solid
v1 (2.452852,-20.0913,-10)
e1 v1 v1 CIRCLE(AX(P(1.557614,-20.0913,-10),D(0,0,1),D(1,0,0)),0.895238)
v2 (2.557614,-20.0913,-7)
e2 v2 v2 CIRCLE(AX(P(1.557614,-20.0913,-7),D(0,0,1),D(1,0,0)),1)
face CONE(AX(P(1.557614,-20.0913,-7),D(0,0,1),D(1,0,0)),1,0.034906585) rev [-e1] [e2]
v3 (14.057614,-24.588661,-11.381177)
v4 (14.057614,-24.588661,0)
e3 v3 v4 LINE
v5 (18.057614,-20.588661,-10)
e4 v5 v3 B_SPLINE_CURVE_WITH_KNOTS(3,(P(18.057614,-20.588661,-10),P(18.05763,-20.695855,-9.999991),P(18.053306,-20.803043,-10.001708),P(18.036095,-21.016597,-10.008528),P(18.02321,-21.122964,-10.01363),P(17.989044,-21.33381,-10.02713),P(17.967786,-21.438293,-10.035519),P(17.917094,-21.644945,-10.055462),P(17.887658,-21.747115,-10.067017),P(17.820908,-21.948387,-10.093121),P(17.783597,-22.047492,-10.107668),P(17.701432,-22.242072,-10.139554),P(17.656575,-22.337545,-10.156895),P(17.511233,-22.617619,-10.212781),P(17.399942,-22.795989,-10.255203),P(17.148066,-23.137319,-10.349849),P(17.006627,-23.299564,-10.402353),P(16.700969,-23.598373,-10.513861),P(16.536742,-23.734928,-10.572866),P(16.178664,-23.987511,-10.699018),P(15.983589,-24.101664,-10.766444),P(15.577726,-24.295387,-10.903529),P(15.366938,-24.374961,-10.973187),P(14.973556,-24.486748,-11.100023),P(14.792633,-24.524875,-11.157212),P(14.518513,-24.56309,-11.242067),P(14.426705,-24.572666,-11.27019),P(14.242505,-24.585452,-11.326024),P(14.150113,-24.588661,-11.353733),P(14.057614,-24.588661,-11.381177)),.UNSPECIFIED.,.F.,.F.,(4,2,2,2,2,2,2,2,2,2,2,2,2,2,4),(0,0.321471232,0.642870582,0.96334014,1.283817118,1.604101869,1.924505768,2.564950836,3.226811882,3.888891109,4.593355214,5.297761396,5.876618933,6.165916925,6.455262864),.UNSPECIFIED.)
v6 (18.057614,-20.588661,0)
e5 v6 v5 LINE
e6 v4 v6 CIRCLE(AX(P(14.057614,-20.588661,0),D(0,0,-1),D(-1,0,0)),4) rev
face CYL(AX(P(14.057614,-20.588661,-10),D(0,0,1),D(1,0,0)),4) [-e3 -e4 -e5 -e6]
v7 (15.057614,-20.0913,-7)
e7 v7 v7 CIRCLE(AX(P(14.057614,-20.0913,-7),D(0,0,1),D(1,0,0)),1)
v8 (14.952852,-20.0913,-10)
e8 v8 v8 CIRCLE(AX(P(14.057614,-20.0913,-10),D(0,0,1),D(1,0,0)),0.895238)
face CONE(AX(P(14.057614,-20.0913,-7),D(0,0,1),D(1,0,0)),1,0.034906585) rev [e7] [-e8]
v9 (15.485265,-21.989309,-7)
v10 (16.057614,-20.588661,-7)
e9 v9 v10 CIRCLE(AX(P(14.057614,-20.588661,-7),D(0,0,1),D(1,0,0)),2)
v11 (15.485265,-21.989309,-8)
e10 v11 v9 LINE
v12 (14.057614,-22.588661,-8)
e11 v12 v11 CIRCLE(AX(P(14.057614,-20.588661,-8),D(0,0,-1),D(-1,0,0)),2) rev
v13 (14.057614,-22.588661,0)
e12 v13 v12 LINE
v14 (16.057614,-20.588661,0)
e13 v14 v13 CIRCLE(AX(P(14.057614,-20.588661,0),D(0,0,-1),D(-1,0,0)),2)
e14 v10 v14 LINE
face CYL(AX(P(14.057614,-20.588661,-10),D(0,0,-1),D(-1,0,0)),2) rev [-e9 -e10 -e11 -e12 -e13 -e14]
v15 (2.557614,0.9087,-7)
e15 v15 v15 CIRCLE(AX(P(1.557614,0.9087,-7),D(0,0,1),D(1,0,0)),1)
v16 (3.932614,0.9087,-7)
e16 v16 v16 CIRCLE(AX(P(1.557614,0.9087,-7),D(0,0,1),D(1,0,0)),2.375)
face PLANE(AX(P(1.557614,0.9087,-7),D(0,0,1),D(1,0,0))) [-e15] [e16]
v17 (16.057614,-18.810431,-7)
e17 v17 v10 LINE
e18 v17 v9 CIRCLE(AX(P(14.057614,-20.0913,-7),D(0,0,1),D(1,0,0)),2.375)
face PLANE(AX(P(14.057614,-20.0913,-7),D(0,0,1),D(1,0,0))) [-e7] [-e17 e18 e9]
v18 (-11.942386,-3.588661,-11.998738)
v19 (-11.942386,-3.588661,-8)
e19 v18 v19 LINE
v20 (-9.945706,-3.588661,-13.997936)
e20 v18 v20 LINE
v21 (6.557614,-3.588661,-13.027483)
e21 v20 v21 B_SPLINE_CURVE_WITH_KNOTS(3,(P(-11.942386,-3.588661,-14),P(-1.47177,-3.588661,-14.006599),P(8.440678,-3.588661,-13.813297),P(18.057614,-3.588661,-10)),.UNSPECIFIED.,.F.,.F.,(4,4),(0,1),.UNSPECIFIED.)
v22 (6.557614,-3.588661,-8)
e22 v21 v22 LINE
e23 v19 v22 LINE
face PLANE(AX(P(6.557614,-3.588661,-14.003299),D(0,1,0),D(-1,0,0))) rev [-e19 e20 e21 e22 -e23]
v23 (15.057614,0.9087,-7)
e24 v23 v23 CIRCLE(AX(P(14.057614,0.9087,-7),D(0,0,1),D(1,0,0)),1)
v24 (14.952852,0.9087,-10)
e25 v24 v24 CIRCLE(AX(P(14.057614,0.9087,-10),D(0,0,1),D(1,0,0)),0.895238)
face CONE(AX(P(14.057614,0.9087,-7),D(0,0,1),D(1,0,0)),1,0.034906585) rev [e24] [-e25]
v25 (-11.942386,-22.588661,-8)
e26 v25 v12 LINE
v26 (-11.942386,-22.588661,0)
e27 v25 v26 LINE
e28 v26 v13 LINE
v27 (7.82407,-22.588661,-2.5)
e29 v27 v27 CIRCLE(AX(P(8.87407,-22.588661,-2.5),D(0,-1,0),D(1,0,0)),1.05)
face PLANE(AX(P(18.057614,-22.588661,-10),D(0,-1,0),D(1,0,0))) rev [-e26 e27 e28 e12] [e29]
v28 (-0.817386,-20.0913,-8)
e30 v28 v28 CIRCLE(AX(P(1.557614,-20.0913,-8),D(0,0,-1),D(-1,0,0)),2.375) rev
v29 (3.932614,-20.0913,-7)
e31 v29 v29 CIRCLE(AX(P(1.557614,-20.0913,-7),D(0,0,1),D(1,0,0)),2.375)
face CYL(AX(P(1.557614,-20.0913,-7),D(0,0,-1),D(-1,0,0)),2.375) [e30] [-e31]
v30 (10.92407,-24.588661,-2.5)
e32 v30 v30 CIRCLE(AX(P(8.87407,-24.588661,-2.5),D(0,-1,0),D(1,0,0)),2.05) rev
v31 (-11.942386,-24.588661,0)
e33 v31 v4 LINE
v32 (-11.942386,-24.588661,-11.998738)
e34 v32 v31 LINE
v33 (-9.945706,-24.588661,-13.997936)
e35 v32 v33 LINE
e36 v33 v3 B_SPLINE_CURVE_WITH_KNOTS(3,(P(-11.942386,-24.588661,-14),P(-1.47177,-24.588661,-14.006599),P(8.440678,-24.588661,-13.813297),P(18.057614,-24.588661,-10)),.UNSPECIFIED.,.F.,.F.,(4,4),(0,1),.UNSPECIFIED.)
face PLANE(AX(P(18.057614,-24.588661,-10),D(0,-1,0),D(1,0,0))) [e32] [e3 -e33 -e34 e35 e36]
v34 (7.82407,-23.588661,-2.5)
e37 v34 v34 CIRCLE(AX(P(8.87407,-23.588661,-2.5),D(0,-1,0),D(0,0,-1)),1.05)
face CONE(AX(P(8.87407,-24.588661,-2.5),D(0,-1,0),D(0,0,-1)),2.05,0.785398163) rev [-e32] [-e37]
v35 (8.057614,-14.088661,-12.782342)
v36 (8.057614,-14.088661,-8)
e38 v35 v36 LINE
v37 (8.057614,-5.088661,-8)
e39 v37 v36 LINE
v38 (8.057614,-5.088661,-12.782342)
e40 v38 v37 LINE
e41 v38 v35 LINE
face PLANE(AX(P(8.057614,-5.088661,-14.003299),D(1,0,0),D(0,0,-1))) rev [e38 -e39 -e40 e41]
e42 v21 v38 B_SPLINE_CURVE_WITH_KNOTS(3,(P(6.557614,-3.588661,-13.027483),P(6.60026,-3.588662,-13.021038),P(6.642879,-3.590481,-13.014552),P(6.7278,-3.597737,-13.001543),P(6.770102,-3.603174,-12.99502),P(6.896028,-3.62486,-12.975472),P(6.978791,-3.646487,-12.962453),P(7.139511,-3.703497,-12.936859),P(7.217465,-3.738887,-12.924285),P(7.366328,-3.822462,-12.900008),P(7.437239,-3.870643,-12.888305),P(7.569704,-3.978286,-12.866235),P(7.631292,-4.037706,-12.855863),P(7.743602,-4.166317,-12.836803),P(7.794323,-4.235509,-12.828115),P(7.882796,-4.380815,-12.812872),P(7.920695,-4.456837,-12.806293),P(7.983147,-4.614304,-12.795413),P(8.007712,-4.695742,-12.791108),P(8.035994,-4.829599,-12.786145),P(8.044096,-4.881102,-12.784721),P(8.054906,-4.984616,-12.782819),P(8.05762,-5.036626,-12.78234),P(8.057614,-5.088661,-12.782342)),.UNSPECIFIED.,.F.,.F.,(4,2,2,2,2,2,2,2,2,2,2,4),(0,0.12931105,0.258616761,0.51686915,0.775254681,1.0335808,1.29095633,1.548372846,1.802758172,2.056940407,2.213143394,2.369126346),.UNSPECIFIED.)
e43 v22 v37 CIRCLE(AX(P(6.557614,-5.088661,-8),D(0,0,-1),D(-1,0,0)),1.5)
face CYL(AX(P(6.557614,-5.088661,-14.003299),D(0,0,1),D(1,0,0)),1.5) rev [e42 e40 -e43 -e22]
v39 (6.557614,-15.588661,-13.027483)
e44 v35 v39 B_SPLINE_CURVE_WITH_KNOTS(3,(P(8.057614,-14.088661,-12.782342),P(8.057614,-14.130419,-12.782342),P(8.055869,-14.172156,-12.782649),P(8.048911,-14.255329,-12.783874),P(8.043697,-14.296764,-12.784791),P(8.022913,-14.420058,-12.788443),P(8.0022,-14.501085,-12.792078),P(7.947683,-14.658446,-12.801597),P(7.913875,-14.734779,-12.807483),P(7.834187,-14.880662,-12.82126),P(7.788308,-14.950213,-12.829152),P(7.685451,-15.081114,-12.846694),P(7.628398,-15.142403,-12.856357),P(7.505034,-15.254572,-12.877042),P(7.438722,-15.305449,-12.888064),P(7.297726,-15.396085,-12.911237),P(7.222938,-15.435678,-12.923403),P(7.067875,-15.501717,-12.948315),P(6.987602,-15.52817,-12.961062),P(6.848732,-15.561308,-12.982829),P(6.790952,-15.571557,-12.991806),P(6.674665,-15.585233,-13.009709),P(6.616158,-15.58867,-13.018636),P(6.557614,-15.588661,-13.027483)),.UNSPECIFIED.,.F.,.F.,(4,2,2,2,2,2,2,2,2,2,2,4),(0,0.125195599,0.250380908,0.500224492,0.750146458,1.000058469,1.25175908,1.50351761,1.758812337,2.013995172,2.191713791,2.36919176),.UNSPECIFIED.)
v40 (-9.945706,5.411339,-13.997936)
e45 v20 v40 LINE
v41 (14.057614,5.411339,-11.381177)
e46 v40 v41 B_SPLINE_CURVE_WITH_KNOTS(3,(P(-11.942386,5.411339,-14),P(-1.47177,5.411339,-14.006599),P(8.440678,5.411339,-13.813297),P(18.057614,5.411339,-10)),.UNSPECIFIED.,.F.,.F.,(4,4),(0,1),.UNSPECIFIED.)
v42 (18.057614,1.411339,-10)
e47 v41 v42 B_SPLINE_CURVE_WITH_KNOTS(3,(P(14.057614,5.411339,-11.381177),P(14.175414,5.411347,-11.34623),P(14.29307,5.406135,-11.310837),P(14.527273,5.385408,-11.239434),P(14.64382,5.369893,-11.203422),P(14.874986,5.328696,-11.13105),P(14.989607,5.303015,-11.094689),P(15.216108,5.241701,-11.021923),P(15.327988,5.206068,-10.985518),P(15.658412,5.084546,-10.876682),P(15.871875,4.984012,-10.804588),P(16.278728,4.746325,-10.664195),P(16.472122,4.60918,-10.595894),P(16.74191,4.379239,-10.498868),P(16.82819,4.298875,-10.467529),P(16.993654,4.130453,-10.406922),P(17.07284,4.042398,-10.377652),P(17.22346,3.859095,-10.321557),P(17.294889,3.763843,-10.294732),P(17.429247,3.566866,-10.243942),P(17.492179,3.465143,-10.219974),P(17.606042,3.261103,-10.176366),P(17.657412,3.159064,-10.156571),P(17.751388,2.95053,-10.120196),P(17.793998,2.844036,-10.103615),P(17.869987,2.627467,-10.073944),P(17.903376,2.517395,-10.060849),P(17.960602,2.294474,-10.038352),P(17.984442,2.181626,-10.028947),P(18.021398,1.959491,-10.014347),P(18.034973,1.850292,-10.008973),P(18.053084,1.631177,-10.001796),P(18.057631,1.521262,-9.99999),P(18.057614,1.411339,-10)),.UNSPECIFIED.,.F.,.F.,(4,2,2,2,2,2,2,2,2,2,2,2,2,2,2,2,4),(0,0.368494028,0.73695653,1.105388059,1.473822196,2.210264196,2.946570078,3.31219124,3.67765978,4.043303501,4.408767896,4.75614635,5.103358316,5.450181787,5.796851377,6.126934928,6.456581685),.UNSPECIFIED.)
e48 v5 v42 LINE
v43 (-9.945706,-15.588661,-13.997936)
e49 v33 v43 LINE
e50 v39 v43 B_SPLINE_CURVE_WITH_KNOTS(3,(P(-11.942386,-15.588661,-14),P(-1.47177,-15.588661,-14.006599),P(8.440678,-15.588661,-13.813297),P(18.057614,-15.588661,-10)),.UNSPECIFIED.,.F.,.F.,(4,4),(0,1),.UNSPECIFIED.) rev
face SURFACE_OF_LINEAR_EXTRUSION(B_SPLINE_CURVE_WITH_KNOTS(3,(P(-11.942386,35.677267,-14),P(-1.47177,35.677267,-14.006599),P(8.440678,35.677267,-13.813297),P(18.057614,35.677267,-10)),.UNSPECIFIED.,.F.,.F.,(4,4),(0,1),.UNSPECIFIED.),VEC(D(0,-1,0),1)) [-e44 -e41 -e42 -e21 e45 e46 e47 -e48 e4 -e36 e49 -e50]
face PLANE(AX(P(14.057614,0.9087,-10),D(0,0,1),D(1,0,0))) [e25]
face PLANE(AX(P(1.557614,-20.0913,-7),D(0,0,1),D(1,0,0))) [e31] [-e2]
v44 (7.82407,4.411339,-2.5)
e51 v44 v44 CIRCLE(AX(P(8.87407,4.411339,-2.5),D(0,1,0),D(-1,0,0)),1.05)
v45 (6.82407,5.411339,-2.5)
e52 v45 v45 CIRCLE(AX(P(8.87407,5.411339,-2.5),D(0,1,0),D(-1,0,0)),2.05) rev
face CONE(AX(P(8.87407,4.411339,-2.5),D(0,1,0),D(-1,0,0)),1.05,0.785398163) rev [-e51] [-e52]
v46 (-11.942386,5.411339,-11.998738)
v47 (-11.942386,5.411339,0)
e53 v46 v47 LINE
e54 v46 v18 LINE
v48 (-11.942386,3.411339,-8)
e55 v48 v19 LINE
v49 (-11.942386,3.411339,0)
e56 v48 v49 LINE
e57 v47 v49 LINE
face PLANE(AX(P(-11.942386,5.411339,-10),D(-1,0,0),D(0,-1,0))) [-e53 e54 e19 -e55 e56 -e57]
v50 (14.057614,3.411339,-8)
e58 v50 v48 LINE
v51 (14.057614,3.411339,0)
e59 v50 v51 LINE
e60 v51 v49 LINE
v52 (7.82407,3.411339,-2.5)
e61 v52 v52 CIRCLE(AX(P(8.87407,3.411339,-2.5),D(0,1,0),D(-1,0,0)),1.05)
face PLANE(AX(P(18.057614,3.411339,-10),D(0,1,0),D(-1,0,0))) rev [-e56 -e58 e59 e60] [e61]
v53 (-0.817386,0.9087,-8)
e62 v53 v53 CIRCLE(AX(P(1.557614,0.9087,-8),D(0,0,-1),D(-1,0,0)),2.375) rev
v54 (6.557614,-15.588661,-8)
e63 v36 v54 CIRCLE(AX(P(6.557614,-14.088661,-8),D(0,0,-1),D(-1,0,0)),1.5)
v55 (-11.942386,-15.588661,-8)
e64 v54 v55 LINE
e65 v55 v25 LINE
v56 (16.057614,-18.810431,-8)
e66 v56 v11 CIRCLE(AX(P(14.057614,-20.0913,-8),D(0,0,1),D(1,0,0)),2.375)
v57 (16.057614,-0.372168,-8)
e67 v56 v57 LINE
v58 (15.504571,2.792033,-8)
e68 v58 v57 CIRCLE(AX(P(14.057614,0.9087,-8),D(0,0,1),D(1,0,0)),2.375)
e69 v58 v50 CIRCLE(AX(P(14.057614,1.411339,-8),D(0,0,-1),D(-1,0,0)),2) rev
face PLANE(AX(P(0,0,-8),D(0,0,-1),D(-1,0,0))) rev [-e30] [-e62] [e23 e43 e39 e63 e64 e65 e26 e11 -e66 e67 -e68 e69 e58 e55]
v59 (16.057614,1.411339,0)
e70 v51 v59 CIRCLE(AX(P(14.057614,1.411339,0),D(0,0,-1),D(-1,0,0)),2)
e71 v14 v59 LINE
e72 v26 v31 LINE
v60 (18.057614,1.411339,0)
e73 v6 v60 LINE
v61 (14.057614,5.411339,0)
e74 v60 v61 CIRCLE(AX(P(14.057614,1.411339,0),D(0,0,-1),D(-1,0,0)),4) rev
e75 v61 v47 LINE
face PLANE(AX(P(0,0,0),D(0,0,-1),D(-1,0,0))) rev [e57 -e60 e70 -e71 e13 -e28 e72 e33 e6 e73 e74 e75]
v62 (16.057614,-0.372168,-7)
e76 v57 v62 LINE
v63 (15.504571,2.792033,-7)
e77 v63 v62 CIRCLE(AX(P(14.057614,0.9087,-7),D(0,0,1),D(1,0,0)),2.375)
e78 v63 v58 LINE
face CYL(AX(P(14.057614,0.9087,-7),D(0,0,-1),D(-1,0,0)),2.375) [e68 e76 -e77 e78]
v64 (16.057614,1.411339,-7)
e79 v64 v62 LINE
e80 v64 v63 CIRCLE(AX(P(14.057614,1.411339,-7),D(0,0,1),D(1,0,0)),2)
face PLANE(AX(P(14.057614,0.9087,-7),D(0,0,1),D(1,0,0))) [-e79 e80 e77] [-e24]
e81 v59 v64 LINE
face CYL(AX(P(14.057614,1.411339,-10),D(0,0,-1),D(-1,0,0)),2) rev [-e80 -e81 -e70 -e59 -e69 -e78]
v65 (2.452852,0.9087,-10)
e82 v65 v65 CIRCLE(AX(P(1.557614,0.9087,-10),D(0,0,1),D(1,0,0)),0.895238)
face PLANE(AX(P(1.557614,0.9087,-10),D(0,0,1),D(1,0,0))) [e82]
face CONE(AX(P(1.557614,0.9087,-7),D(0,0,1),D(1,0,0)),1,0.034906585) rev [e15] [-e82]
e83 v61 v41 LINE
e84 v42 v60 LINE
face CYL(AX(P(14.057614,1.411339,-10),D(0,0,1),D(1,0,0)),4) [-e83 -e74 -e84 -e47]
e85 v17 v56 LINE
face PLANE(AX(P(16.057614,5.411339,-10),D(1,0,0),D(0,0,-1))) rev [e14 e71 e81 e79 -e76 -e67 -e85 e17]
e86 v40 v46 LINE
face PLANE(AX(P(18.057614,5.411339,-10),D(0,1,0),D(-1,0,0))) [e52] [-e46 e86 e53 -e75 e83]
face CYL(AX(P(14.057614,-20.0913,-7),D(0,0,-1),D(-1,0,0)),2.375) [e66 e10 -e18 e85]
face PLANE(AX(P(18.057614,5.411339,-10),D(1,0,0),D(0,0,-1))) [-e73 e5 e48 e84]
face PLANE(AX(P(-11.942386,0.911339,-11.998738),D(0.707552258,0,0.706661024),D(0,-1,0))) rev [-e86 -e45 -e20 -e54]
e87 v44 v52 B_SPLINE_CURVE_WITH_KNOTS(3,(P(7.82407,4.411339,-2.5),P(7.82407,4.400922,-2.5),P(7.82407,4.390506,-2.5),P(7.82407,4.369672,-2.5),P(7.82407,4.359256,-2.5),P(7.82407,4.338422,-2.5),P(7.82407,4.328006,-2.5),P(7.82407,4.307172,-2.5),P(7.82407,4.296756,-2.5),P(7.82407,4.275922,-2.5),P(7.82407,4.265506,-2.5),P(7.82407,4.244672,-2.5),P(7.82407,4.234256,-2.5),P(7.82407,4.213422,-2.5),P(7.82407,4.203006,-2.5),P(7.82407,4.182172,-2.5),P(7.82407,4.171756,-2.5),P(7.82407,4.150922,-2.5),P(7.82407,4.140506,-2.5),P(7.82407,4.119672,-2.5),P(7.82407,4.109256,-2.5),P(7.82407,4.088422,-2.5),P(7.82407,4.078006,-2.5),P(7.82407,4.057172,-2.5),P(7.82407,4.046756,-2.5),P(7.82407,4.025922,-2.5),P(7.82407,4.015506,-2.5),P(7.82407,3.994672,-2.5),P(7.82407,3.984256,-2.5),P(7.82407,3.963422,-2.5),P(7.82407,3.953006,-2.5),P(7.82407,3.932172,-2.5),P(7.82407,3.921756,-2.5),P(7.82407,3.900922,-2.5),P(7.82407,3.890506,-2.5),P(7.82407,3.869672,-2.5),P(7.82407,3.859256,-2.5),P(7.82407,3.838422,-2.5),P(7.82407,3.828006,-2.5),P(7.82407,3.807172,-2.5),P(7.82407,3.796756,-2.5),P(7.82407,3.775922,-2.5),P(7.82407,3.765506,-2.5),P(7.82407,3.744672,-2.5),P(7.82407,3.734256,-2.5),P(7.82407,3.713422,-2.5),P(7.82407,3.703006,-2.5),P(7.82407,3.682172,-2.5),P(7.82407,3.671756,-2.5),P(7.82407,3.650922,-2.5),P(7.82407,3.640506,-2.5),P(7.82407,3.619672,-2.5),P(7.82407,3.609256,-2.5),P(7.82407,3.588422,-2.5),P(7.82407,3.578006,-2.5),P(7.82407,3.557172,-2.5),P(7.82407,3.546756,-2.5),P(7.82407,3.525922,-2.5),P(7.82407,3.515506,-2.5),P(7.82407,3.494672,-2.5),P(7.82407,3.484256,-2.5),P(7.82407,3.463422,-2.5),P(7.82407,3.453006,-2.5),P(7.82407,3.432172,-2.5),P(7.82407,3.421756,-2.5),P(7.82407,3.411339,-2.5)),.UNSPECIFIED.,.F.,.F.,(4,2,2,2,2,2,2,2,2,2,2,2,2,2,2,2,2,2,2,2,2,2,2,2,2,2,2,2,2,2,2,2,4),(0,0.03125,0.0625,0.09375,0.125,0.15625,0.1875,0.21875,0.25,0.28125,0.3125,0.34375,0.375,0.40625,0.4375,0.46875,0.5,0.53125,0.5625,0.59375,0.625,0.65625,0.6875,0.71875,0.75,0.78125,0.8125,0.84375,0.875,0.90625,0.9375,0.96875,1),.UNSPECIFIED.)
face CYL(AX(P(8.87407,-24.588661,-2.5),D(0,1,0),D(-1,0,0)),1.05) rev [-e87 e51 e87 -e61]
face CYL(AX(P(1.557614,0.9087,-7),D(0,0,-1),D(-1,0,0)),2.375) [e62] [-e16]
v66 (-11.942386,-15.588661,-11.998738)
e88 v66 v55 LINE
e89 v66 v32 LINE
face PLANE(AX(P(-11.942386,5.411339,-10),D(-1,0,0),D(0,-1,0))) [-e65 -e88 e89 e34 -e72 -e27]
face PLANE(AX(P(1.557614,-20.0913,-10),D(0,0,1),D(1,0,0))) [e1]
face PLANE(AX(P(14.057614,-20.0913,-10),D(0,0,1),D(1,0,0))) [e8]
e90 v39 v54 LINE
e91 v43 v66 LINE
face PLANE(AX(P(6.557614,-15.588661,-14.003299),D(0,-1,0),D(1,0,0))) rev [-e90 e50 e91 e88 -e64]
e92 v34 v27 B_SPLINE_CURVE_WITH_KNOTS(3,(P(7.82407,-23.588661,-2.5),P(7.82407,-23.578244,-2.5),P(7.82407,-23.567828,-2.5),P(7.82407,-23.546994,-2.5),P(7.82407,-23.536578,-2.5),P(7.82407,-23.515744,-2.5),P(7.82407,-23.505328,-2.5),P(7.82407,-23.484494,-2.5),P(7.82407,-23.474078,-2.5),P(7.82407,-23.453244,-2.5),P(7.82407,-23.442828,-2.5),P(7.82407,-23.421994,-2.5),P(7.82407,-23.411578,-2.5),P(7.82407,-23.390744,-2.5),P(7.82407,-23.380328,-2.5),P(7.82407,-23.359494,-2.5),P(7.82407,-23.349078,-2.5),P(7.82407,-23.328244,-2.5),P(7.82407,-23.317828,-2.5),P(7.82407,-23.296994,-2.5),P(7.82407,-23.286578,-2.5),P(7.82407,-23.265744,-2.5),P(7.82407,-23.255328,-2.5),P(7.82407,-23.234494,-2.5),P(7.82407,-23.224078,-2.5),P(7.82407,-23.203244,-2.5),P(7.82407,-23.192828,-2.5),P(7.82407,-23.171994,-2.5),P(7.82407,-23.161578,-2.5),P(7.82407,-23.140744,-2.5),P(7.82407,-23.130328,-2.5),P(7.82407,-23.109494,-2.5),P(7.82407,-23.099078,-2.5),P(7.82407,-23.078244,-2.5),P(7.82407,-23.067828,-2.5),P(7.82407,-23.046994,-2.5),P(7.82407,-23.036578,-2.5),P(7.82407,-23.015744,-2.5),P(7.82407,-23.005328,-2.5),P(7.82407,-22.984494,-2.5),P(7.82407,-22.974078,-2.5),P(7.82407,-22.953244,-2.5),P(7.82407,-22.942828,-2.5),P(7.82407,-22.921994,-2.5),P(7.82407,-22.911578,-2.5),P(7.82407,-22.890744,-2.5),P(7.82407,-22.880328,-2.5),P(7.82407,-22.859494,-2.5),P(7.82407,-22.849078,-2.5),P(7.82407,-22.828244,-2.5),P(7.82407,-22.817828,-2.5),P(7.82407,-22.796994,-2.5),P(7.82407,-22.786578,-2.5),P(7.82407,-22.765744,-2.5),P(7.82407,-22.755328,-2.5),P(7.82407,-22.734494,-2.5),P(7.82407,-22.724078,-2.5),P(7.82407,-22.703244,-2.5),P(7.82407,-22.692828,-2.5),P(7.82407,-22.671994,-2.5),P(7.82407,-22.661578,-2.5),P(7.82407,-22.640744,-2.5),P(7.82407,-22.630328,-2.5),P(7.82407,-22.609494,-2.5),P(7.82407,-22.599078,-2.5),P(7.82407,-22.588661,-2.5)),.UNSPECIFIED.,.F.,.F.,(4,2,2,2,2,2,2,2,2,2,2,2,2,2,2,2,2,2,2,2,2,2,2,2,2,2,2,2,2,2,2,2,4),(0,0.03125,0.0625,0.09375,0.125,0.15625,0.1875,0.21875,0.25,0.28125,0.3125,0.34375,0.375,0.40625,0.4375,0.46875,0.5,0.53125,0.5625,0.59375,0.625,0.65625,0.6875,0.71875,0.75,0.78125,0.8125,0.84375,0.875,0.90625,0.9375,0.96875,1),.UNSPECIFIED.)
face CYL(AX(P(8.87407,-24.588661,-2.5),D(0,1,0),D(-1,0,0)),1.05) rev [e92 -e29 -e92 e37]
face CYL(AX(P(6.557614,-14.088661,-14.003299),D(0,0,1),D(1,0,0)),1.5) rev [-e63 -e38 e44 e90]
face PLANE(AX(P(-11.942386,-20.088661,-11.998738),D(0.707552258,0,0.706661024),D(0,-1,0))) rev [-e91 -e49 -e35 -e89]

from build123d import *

# Parameters (mm, degrees)
SKETCH_2_W                    = 30
SKETCH_2_H                    = 30
EXTRUDE_1_DEPTH               = 10
SHELL_1_T                     = -2
CUT_EXTRUDE_1_REACH           = 34.104
SKETCH_3_W                    = 28
SKETCH_3_H                    = 26
EXTRUDE_2_DEPTH               = 30
CUT_EXTRUDE_2_DEPTH           = 34.566112599
SKETCH_6_R                    = 2.375
EXTRUDE_3_DEPTH               = 1
SKETCH_7_R                    = 1
CUT_EXTRUDE_3_DEPTH           = 3
CUT_EXTRUDE_3_DRAFT           = -2
CUT_EXTRUDE_3_PROFILE_2_DEPTH = 3
CUT_EXTRUDE_3_PROFILE_2_DRAFT = -2
CUT_EXTRUDE_3_PROFILE_3_DEPTH = 3
CUT_EXTRUDE_3_PROFILE_3_DRAFT = -2
CUT_EXTRUDE_3_PROFILE_4_DEPTH = 3
CUT_EXTRUDE_3_PROFILE_4_DRAFT = -2
FILLET_2_R                    = 2
FILLET_3_R                    = 4
SKETCH_8_R                    = 1.05
CUT_EXTRUDE_4_DEPTH           = 38.710498044
CHAMFER_1_SIZE                = 1
CHAMFER_2_SIZE                = 2.001261587
CHAMFER_2_SIZE_2              = 2


with BuildPart() as part:
    # 草图2 → 凸台-拉伸1 (new body)
    with BuildSketch(Plane.XY):
        with Locations((3.057614324, -9.588661073)):
            Rectangle(SKETCH_2_W, SKETCH_2_H)
    extrude(amount=-EXTRUDE_1_DEPTH)

    # 抽壳1
    shell_1_openings = [part.faces().sort_by_distance(p)[0] for p in [
        (-11.942385676, -9.588661073, -5),
    ]]
    offset(amount=SHELL_1_T, openings=shell_1_openings, kind=Kind.INTERSECTION)

    # 草图3 → 切除-拉伸1 (cut, up to next)
    with BuildSketch(Plane.XY, mode=Mode.PRIVATE) as cut_extrude_1_sk1:
        with Locations((2.057614324, -9.588661073)):
            Rectangle(SKETCH_3_W, SKETCH_3_H)
    cut_extrude_1_tool1 = extrude(cut_extrude_1_sk1.sketch, amount=-CUT_EXTRUDE_1_REACH, mode=Mode.PRIVATE) & part.part
    add(cut_extrude_1_tool1.solids().sort_by_distance((2.057614, -9.588661, 0))[0], mode=Mode.SUBTRACT)

    # 草图4 → 凸台-拉伸2 (add)
    with BuildSketch(Plane.XZ.offset(24.588661073)):
        with BuildLine():
            Line((-11.942385676, -10), (-11.942385676, -14))
            add(Edge.make_bspline(
                [(-11.942385676, -14), (-1.471769767, -14.006598556), (8.440678476, -13.813297469), (18.057614324, -10)],
                knots=[0, 0, 0, 0, 1, 1, 1, 1], degree=3))
            Line((18.057614324, -10), (-11.942385676, -10))
        make_face()
    extrude(amount=-EXTRUDE_2_DEPTH)

    # 草图5 → 切除-拉伸2 (cut, through all)
    with BuildSketch(Plane.XY):
        with BuildLine():
            Line((6.557614324, -3.588661073), (-11.942385676, -3.588661073))
            Line((-11.942385676, -3.588661073), (-11.942385676, -15.588661073))
            Line((-11.942385676, -15.588661073), (6.557614324, -15.588661073))
            ThreePointArc((6.557614324, -15.588661073), (7.618274496, -15.149321245), (8.057614324, -14.088661073))
            Line((8.057614324, -14.088661073), (8.057614324, -5.088661073))
            ThreePointArc((8.057614324, -5.088661073), (7.618274496, -4.028000901), (6.557614324, -3.588661073))
        make_face()
    extrude(amount=-CUT_EXTRUDE_2_DEPTH, mode=Mode.SUBTRACT)

    # 草图6 → 凸台-拉伸3 (add)
    with BuildSketch(Plane.XY.offset(-8)):
        with Locations(Location((1.557614324, 0.908700453, 0), (0, 0, 180))):
            Circle(SKETCH_6_R)
        with Locations((14.057614324, 0.908700453)):
            Circle(SKETCH_6_R)
        with Locations(Location((1.557614324, -20.091299547, 0), (0, 0, 180))):
            Circle(SKETCH_6_R)
        with Locations((14.057614324, -20.091299547)):
            Circle(SKETCH_6_R)
    extrude(amount=EXTRUDE_3_DEPTH)


with BuildPart() as cut_extrude_3_tool:
    # 草图7 → 切除-拉伸3 (with draft: the straight prism first)
    with BuildSketch(Plane.XY.offset(-7)):
        with Locations((1.557614324, -20.091299547)):
            Circle(SKETCH_7_R)
    extrude(amount=-CUT_EXTRUDE_3_DEPTH)
    # 切除-拉伸3: the draft: its side faces are tilted about the plane it starts from
    cut_extrude_3_sides = [cut_extrude_3_tool.faces().sort_by_distance(p)[0] for p in [
        (0.557614324, -20.091299547, -8.5),
    ]]
    draft(cut_extrude_3_sides, Plane.XY.offset(-7), CUT_EXTRUDE_3_DRAFT)


with BuildPart() as part_1:
    add(part.part)

    # 切除-拉伸3: cut by cut_extrude_3_tool
    add(cut_extrude_3_tool.part, mode=Mode.SUBTRACT)


with BuildPart() as cut_extrude_3_profile_2_tool:
    # 草图7 → 切除-拉伸3 profile 2 (with draft: the straight prism first)
    with BuildSketch(Plane.XY.offset(-7)):
        with Locations((14.057614324, -20.091299547)):
            Circle(SKETCH_7_R)
    extrude(amount=-CUT_EXTRUDE_3_PROFILE_2_DEPTH)
    # 切除-拉伸3 profile 2: the draft: its side faces are tilted about the plane it starts from
    cut_extrude_3_profile_2_sides = [cut_extrude_3_profile_2_tool.faces().sort_by_distance(p)[0] for p in [
        (13.057614324, -20.091299547, -8.5),
    ]]
    draft(cut_extrude_3_profile_2_sides, Plane.XY.offset(-7), CUT_EXTRUDE_3_PROFILE_2_DRAFT)


with BuildPart() as part_2:
    add(part_1.part)

    # 切除-拉伸3 profile 2: cut by cut_extrude_3_profile_2_tool
    add(cut_extrude_3_profile_2_tool.part, mode=Mode.SUBTRACT)


with BuildPart() as cut_extrude_3_profile_3_tool:
    # 草图7 → 切除-拉伸3 profile 3 (with draft: the straight prism first)
    with BuildSketch(Plane.XY.offset(-7)):
        with Locations((1.557614324, 0.908700453)):
            Circle(SKETCH_7_R)
    extrude(amount=-CUT_EXTRUDE_3_PROFILE_3_DEPTH)
    # 切除-拉伸3 profile 3: the draft: its side faces are tilted about the plane it starts from
    cut_extrude_3_profile_3_sides = [cut_extrude_3_profile_3_tool.faces().sort_by_distance(p)[0] for p in [
        (0.557614324, 0.908700453, -8.5),
    ]]
    draft(cut_extrude_3_profile_3_sides, Plane.XY.offset(-7), CUT_EXTRUDE_3_PROFILE_3_DRAFT)


with BuildPart() as part_3:
    add(part_2.part)

    # 切除-拉伸3 profile 3: cut by cut_extrude_3_profile_3_tool
    add(cut_extrude_3_profile_3_tool.part, mode=Mode.SUBTRACT)


with BuildPart() as cut_extrude_3_profile_4_tool:
    # 草图7 → 切除-拉伸3 profile 4 (with draft: the straight prism first)
    with BuildSketch(Plane.XY.offset(-7)):
        with Locations((14.057614324, 0.908700453)):
            Circle(SKETCH_7_R)
    extrude(amount=-CUT_EXTRUDE_3_PROFILE_4_DEPTH)
    # 切除-拉伸3 profile 4: the draft: its side faces are tilted about the plane it starts from
    cut_extrude_3_profile_4_sides = [cut_extrude_3_profile_4_tool.faces().sort_by_distance(p)[0] for p in [
        (13.057614324, 0.908700453, -8.5),
    ]]
    draft(cut_extrude_3_profile_4_sides, Plane.XY.offset(-7), CUT_EXTRUDE_3_PROFILE_4_DRAFT)


with BuildPart() as part_4:
    add(part_3.part)

    # 切除-拉伸3 profile 4: cut by cut_extrude_3_profile_4_tool
    add(cut_extrude_3_profile_4_tool.part, mode=Mode.SUBTRACT)

    # 圆角2
    fillet_2_edges = [part_4.edges().sort_by_distance(p)[0] for p in [
        (16.057614324, 3.411338927, -4),
        (16.057614324, -22.588661073, -4),
    ]]
    fillet(fillet_2_edges, radius=FILLET_2_R)

    # 圆角3
    fillet_3_edges = [part_4.edges().sort_by_distance(p)[0] for p in [
        (18.057614324, -24.588661073, -5),
        (18.057614324, 5.411338927, -5),
    ]]
    fillet(fillet_3_edges, radius=FILLET_3_R)

    # 草图8 → 切除-拉伸4 (cut, through all)
    with BuildSketch(Plane(origin=(0, 5.411338927, 0), x_dir=(1, 0, 0), z_dir=(0, 1, 0))):
        with Locations(Location((8.874069652, 2.5, 0), (0, 0, 180))):
            Circle(SKETCH_8_R)
    extrude(amount=-CUT_EXTRUDE_4_DEPTH, mode=Mode.SUBTRACT)

    # 倒角1
    chamfer_1_edges = [part_4.edges().sort_by_distance(p)[0] for p in [
        (9.924069652, -24.588661073, -2.5),
        (9.924069652, 5.411338927, -2.5),
    ]]
    chamfer(chamfer_1_edges, length=CHAMFER_1_SIZE)

    # 倒角2
    # the kernel refuses this chamfer: 2.001261587, 2 mm, written as the material it takes off along each edge
    with BuildSketch(Plane(origin=(-11.942385676, -8.735358117, -14), x_dir=(0.9999994656090836, 0, 0.0010338189141659818), z_dir=(0, 1, 0))) as chamfer_2_piece_1:
        with BuildLine():
            Line((1.996680257, 0), (CHAMFER_2_SIZE * 0.00103381891429, -CHAMFER_2_SIZE * 0.99999946573))
            Line((CHAMFER_2_SIZE * 0.00103381891429, -CHAMFER_2_SIZE * 0.99999946573), (0, 0))
            ThreePointArc((0, 0), (1.026596764, 0.000946618), (1.996680257, 0))
        make_face()
    extrude(amount=19.293394088, mode=Mode.SUBTRACT)
    with BuildSketch(Plane(origin=(-11.942385676, -29.732118676, -14), x_dir=(0.99999946423231, 0, 0.001035149792544402), z_dir=(0, 1, 0))) as chamfer_2_piece_2:
        with BuildLine():
            Line((1.997932911, 0), (CHAMFER_2_SIZE_2 * 0.00103514979254, -CHAMFER_2_SIZE_2 * 0.999999464232))
            Line((CHAMFER_2_SIZE_2 * 0.00103514979254, -CHAMFER_2_SIZE_2 * 0.999999464232), (0, 0))
            ThreePointArc((0, 0), (1.027240915, 0.000948024), (1.997932911, 0))
        make_face()
    extrude(amount=19.286915207, mode=Mode.SUBTRACT)


solid = part_4.part
